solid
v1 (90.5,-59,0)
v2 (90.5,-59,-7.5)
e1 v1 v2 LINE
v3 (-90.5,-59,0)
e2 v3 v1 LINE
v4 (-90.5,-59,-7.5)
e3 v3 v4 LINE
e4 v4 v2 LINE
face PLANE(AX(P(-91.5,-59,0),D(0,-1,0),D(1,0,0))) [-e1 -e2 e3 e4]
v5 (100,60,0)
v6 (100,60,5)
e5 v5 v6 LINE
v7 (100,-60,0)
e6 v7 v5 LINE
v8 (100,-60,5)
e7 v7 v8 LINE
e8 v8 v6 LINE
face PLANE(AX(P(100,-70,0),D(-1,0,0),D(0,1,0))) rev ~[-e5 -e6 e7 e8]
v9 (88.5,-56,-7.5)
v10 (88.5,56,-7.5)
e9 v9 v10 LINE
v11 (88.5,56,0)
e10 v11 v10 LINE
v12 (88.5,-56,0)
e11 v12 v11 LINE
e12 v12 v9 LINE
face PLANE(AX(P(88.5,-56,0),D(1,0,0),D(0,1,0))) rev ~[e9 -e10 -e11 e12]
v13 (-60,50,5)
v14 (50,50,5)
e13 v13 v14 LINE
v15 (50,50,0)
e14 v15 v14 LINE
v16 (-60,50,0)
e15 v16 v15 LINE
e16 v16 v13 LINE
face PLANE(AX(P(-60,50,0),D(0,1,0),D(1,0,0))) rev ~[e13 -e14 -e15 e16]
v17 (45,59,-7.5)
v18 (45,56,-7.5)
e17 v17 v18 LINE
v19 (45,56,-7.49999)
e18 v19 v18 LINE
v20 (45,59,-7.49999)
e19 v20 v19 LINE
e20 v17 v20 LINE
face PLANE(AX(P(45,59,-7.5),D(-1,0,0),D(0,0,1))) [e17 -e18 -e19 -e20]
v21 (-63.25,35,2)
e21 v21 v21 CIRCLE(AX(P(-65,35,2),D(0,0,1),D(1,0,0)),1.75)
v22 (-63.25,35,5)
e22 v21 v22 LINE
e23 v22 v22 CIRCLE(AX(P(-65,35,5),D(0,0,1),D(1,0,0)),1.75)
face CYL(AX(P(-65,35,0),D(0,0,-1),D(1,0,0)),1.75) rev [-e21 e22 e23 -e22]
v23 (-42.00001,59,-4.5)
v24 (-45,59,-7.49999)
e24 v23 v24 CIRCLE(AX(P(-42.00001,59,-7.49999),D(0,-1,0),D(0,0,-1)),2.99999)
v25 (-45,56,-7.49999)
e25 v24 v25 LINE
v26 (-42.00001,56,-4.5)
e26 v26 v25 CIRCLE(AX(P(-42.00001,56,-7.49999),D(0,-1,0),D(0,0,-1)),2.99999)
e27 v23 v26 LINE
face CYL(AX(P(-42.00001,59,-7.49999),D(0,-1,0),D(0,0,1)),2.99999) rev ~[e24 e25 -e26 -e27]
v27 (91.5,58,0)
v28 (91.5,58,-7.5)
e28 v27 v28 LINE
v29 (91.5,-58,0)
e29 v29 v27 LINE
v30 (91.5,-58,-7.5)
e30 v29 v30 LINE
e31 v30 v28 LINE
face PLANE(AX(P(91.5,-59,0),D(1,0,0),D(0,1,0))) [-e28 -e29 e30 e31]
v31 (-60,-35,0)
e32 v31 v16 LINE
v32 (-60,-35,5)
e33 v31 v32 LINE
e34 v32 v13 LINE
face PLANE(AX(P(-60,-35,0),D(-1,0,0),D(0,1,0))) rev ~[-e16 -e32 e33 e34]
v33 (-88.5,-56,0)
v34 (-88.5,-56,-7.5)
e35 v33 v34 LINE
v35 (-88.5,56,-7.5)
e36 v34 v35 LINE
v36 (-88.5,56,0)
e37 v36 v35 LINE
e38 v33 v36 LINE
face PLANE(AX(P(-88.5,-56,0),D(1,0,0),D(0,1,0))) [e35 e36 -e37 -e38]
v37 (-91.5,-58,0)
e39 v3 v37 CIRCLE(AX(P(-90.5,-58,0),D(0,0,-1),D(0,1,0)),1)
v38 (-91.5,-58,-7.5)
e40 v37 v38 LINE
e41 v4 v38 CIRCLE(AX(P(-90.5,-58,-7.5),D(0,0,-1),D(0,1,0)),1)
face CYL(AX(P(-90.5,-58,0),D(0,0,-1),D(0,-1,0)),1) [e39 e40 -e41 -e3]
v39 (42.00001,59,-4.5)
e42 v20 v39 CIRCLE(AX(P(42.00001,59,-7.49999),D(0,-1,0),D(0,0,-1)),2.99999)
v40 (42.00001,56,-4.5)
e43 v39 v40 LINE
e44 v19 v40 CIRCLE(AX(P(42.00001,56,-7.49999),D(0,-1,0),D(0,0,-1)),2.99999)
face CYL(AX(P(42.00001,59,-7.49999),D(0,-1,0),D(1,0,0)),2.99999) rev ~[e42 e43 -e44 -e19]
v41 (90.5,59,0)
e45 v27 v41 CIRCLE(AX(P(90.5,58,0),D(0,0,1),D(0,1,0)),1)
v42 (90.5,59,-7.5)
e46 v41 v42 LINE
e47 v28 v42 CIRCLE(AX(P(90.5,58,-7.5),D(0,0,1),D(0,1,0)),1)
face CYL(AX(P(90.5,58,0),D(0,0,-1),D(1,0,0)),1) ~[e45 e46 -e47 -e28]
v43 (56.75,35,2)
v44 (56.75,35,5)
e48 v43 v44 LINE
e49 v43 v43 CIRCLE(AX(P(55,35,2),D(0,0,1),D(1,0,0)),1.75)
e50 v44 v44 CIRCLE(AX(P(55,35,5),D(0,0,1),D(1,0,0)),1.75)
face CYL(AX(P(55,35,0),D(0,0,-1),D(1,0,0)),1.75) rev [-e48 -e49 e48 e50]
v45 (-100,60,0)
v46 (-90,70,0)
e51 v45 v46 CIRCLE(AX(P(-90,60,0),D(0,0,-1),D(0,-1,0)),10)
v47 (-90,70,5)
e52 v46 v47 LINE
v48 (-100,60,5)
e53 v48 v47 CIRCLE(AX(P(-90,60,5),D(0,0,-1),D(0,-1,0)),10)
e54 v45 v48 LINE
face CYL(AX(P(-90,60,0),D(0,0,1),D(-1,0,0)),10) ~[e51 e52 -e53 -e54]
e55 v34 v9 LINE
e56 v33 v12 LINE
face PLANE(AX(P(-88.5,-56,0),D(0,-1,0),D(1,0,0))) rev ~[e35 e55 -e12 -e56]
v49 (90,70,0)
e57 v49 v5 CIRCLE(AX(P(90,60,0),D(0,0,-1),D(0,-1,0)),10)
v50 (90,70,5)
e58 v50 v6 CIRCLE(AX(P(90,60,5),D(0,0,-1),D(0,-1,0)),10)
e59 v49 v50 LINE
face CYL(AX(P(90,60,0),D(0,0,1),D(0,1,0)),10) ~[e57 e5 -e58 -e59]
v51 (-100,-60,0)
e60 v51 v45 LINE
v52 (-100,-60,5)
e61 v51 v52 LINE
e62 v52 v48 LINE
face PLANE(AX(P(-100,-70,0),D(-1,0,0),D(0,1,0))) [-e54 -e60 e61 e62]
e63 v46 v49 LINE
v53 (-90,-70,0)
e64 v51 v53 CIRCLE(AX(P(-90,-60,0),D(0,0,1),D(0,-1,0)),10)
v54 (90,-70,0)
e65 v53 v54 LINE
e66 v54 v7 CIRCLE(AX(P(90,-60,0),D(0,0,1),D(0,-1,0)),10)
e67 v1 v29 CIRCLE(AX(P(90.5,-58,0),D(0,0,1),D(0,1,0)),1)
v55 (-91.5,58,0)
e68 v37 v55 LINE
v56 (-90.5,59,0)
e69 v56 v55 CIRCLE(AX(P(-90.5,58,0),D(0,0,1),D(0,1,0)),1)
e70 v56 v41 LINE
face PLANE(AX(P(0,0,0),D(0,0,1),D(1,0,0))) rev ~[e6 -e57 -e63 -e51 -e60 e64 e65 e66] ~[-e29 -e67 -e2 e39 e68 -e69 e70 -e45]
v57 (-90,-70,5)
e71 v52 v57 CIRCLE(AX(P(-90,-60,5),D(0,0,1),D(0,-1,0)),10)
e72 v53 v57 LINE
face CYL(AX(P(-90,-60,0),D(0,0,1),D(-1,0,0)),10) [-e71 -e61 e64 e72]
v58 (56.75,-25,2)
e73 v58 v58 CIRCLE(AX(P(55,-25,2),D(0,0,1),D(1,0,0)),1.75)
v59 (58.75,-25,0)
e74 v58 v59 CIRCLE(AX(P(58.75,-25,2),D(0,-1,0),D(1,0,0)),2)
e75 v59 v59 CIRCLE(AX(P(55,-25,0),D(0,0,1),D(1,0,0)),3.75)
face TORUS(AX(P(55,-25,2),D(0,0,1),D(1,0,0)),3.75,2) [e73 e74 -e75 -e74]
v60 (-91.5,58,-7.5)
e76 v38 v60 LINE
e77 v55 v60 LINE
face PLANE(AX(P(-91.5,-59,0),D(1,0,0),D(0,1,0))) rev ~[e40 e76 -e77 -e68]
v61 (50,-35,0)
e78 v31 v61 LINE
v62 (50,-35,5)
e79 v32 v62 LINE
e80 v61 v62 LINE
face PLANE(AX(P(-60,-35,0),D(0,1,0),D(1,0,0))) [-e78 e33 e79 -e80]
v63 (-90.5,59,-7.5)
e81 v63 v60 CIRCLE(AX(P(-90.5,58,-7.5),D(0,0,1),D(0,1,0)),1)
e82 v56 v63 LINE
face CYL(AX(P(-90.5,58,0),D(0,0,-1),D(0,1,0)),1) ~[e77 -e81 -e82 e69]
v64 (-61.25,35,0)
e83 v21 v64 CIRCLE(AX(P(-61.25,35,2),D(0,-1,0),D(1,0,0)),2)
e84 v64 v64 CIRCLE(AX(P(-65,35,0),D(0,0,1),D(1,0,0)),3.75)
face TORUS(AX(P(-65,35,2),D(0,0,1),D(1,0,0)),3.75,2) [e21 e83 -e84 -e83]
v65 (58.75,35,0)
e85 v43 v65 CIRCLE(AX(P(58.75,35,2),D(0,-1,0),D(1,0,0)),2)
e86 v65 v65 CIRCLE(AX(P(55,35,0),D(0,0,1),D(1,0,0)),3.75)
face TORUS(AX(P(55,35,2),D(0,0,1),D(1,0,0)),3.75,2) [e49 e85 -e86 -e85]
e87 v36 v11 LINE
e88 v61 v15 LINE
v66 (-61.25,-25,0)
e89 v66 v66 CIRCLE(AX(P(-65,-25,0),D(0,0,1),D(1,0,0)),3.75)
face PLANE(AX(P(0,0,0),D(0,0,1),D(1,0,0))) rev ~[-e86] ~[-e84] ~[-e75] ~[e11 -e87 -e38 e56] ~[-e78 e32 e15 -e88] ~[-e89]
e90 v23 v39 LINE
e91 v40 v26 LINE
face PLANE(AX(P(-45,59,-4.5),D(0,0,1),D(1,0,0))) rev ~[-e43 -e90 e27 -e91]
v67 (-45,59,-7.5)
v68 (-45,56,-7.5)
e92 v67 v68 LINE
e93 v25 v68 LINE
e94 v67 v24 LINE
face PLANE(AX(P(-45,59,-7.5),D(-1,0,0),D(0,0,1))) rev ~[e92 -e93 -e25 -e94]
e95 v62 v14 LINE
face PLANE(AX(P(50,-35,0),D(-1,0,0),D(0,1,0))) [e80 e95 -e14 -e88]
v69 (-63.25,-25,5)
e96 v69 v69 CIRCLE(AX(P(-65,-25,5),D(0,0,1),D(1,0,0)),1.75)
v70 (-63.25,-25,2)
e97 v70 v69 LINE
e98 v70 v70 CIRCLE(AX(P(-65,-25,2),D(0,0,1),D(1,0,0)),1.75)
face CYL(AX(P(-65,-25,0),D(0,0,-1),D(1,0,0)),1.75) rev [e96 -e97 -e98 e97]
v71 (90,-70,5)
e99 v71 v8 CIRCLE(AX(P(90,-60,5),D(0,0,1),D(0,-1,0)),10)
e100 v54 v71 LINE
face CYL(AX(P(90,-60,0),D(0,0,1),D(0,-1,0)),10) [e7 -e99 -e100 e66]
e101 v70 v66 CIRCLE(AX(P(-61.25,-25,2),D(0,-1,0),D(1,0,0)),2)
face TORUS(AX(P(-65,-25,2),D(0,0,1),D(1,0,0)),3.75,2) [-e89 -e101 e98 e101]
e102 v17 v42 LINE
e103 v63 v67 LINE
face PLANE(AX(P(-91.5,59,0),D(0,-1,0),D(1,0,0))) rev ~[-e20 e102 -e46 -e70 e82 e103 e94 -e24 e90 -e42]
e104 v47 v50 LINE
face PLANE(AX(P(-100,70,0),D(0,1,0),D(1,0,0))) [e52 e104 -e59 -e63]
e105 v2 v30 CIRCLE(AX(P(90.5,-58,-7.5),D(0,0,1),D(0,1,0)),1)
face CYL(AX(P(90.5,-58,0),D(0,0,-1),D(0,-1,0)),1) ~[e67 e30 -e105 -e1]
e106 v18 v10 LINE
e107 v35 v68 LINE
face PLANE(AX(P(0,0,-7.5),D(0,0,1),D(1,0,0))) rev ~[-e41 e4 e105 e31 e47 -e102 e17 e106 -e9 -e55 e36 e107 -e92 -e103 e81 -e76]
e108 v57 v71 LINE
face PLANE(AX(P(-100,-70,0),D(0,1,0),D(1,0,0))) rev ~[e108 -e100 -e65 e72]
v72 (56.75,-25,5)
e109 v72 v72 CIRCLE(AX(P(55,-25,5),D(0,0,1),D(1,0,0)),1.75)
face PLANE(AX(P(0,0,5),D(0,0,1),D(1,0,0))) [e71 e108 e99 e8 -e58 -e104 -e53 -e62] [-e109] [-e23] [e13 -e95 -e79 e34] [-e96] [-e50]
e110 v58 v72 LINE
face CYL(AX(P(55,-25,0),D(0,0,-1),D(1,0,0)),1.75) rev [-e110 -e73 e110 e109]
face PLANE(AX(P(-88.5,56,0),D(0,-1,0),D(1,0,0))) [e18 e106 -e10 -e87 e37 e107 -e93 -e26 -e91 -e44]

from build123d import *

# Parameters (mm, degrees)
F0_W     = 200
F0_H     = 140
F0_W_2   = 183
F0_H_2   = 118
F0_W_3   = 177
F0_H_3   = 112
F0_R     = 1.75
F0_W_4   = 110
F0_H_4   = 85
F1_DEPTH = 5
F2_DEPTH = 7.5
F3_R     = 10
F4_R     = 1
F5_R     = 2
F6_W     = 45
F6_H     = 3
F7_DEPTH = 25
F8_R     = 2.99999


# Not quite as in the source:
# - a fillet or chamfer is up to 0.001 mm smaller than in the source, because OpenCascade refuses the exact size


with BuildPart() as f1:
    # F0 (on Top) → F1 (new body)
    with BuildSketch(Plane.XY):
        Rectangle(F0_W, F0_H)
        Rectangle(F0_W_2, F0_H_2, mode=Mode.SUBTRACT)
        Rectangle(F0_W_2, F0_H_2)
        Rectangle(F0_W_3, F0_H_3, mode=Mode.SUBTRACT)
        Rectangle(F0_W_3, F0_H_3)
        with Locations((-65, -25)):
            Circle(F0_R, mode=Mode.SUBTRACT)
        with Locations((55, -25)):
            Circle(F0_R, mode=Mode.SUBTRACT)
        with Locations((-5, 7.5)):
            Rectangle(F0_W_4, F0_H_4, mode=Mode.SUBTRACT)
        with Locations((-65, 35)):
            Circle(F0_R, mode=Mode.SUBTRACT)
        with Locations((55, 35)):
            Circle(F0_R, mode=Mode.SUBTRACT)
    extrude(amount=F1_DEPTH)

    # F0 (on Top) → F2 (join)
    with BuildSketch(Plane.XY):
        Rectangle(F0_W_2, F0_H_2)
        Rectangle(F0_W_3, F0_H_3, mode=Mode.SUBTRACT)
    extrude(amount=-F2_DEPTH)

    # F3
    f3_edges = [f1.edges().sort_by_distance(p)[0] for p in [
        (-100, 70, 2.5),
        (-100, -70, 2.5),
        (100, -70, 2.5),
        (100, 70, 2.5),
    ]]
    fillet(f3_edges, radius=F3_R)

    # F4
    f4_edges = [f1.edges().sort_by_distance(p)[0] for p in [
        (-91.5, -59, -3.75),
        (91.5, -59, -3.75),
        (-91.5, 59, -3.75),
        (91.5, 59, -3.75),
    ]]
    fillet(f4_edges, radius=F4_R)

    # F5
    f5_edges = [f1.edges().sort_by_distance(p)[0] for p in [
        (-66.75, -25, 0),
        (53.25, -25, 0),
        (-66.75, 35, 0),
        (53.25, 35, 0),
    ]]
    fillet(f5_edges, radius=F5_R)

    # F6 (on face) → F7 (cut)
    with BuildSketch(Plane(origin=(0, 59, 0), x_dir=(-1, 0, 0), z_dir=(0, 1, 0))):
        with Locations((-22.5, -6)):
            Rectangle(F6_W, F6_H)
        with Locations((22.5, -6)):
            Rectangle(F6_W, F6_H)
    extrude(amount=-F7_DEPTH, mode=Mode.SUBTRACT)

    # F8 (radius 3 in the source; OpenCascade refuses exactly that, so slightly less here)
    f8_edges = [f1.edges().sort_by_distance(p)[0] for p in [
        (-45, 57.5, -4.5),
        (45, 57.5, -4.5),
    ]]
    fillet(f8_edges, radius=F8_R)


solid = f1.part
